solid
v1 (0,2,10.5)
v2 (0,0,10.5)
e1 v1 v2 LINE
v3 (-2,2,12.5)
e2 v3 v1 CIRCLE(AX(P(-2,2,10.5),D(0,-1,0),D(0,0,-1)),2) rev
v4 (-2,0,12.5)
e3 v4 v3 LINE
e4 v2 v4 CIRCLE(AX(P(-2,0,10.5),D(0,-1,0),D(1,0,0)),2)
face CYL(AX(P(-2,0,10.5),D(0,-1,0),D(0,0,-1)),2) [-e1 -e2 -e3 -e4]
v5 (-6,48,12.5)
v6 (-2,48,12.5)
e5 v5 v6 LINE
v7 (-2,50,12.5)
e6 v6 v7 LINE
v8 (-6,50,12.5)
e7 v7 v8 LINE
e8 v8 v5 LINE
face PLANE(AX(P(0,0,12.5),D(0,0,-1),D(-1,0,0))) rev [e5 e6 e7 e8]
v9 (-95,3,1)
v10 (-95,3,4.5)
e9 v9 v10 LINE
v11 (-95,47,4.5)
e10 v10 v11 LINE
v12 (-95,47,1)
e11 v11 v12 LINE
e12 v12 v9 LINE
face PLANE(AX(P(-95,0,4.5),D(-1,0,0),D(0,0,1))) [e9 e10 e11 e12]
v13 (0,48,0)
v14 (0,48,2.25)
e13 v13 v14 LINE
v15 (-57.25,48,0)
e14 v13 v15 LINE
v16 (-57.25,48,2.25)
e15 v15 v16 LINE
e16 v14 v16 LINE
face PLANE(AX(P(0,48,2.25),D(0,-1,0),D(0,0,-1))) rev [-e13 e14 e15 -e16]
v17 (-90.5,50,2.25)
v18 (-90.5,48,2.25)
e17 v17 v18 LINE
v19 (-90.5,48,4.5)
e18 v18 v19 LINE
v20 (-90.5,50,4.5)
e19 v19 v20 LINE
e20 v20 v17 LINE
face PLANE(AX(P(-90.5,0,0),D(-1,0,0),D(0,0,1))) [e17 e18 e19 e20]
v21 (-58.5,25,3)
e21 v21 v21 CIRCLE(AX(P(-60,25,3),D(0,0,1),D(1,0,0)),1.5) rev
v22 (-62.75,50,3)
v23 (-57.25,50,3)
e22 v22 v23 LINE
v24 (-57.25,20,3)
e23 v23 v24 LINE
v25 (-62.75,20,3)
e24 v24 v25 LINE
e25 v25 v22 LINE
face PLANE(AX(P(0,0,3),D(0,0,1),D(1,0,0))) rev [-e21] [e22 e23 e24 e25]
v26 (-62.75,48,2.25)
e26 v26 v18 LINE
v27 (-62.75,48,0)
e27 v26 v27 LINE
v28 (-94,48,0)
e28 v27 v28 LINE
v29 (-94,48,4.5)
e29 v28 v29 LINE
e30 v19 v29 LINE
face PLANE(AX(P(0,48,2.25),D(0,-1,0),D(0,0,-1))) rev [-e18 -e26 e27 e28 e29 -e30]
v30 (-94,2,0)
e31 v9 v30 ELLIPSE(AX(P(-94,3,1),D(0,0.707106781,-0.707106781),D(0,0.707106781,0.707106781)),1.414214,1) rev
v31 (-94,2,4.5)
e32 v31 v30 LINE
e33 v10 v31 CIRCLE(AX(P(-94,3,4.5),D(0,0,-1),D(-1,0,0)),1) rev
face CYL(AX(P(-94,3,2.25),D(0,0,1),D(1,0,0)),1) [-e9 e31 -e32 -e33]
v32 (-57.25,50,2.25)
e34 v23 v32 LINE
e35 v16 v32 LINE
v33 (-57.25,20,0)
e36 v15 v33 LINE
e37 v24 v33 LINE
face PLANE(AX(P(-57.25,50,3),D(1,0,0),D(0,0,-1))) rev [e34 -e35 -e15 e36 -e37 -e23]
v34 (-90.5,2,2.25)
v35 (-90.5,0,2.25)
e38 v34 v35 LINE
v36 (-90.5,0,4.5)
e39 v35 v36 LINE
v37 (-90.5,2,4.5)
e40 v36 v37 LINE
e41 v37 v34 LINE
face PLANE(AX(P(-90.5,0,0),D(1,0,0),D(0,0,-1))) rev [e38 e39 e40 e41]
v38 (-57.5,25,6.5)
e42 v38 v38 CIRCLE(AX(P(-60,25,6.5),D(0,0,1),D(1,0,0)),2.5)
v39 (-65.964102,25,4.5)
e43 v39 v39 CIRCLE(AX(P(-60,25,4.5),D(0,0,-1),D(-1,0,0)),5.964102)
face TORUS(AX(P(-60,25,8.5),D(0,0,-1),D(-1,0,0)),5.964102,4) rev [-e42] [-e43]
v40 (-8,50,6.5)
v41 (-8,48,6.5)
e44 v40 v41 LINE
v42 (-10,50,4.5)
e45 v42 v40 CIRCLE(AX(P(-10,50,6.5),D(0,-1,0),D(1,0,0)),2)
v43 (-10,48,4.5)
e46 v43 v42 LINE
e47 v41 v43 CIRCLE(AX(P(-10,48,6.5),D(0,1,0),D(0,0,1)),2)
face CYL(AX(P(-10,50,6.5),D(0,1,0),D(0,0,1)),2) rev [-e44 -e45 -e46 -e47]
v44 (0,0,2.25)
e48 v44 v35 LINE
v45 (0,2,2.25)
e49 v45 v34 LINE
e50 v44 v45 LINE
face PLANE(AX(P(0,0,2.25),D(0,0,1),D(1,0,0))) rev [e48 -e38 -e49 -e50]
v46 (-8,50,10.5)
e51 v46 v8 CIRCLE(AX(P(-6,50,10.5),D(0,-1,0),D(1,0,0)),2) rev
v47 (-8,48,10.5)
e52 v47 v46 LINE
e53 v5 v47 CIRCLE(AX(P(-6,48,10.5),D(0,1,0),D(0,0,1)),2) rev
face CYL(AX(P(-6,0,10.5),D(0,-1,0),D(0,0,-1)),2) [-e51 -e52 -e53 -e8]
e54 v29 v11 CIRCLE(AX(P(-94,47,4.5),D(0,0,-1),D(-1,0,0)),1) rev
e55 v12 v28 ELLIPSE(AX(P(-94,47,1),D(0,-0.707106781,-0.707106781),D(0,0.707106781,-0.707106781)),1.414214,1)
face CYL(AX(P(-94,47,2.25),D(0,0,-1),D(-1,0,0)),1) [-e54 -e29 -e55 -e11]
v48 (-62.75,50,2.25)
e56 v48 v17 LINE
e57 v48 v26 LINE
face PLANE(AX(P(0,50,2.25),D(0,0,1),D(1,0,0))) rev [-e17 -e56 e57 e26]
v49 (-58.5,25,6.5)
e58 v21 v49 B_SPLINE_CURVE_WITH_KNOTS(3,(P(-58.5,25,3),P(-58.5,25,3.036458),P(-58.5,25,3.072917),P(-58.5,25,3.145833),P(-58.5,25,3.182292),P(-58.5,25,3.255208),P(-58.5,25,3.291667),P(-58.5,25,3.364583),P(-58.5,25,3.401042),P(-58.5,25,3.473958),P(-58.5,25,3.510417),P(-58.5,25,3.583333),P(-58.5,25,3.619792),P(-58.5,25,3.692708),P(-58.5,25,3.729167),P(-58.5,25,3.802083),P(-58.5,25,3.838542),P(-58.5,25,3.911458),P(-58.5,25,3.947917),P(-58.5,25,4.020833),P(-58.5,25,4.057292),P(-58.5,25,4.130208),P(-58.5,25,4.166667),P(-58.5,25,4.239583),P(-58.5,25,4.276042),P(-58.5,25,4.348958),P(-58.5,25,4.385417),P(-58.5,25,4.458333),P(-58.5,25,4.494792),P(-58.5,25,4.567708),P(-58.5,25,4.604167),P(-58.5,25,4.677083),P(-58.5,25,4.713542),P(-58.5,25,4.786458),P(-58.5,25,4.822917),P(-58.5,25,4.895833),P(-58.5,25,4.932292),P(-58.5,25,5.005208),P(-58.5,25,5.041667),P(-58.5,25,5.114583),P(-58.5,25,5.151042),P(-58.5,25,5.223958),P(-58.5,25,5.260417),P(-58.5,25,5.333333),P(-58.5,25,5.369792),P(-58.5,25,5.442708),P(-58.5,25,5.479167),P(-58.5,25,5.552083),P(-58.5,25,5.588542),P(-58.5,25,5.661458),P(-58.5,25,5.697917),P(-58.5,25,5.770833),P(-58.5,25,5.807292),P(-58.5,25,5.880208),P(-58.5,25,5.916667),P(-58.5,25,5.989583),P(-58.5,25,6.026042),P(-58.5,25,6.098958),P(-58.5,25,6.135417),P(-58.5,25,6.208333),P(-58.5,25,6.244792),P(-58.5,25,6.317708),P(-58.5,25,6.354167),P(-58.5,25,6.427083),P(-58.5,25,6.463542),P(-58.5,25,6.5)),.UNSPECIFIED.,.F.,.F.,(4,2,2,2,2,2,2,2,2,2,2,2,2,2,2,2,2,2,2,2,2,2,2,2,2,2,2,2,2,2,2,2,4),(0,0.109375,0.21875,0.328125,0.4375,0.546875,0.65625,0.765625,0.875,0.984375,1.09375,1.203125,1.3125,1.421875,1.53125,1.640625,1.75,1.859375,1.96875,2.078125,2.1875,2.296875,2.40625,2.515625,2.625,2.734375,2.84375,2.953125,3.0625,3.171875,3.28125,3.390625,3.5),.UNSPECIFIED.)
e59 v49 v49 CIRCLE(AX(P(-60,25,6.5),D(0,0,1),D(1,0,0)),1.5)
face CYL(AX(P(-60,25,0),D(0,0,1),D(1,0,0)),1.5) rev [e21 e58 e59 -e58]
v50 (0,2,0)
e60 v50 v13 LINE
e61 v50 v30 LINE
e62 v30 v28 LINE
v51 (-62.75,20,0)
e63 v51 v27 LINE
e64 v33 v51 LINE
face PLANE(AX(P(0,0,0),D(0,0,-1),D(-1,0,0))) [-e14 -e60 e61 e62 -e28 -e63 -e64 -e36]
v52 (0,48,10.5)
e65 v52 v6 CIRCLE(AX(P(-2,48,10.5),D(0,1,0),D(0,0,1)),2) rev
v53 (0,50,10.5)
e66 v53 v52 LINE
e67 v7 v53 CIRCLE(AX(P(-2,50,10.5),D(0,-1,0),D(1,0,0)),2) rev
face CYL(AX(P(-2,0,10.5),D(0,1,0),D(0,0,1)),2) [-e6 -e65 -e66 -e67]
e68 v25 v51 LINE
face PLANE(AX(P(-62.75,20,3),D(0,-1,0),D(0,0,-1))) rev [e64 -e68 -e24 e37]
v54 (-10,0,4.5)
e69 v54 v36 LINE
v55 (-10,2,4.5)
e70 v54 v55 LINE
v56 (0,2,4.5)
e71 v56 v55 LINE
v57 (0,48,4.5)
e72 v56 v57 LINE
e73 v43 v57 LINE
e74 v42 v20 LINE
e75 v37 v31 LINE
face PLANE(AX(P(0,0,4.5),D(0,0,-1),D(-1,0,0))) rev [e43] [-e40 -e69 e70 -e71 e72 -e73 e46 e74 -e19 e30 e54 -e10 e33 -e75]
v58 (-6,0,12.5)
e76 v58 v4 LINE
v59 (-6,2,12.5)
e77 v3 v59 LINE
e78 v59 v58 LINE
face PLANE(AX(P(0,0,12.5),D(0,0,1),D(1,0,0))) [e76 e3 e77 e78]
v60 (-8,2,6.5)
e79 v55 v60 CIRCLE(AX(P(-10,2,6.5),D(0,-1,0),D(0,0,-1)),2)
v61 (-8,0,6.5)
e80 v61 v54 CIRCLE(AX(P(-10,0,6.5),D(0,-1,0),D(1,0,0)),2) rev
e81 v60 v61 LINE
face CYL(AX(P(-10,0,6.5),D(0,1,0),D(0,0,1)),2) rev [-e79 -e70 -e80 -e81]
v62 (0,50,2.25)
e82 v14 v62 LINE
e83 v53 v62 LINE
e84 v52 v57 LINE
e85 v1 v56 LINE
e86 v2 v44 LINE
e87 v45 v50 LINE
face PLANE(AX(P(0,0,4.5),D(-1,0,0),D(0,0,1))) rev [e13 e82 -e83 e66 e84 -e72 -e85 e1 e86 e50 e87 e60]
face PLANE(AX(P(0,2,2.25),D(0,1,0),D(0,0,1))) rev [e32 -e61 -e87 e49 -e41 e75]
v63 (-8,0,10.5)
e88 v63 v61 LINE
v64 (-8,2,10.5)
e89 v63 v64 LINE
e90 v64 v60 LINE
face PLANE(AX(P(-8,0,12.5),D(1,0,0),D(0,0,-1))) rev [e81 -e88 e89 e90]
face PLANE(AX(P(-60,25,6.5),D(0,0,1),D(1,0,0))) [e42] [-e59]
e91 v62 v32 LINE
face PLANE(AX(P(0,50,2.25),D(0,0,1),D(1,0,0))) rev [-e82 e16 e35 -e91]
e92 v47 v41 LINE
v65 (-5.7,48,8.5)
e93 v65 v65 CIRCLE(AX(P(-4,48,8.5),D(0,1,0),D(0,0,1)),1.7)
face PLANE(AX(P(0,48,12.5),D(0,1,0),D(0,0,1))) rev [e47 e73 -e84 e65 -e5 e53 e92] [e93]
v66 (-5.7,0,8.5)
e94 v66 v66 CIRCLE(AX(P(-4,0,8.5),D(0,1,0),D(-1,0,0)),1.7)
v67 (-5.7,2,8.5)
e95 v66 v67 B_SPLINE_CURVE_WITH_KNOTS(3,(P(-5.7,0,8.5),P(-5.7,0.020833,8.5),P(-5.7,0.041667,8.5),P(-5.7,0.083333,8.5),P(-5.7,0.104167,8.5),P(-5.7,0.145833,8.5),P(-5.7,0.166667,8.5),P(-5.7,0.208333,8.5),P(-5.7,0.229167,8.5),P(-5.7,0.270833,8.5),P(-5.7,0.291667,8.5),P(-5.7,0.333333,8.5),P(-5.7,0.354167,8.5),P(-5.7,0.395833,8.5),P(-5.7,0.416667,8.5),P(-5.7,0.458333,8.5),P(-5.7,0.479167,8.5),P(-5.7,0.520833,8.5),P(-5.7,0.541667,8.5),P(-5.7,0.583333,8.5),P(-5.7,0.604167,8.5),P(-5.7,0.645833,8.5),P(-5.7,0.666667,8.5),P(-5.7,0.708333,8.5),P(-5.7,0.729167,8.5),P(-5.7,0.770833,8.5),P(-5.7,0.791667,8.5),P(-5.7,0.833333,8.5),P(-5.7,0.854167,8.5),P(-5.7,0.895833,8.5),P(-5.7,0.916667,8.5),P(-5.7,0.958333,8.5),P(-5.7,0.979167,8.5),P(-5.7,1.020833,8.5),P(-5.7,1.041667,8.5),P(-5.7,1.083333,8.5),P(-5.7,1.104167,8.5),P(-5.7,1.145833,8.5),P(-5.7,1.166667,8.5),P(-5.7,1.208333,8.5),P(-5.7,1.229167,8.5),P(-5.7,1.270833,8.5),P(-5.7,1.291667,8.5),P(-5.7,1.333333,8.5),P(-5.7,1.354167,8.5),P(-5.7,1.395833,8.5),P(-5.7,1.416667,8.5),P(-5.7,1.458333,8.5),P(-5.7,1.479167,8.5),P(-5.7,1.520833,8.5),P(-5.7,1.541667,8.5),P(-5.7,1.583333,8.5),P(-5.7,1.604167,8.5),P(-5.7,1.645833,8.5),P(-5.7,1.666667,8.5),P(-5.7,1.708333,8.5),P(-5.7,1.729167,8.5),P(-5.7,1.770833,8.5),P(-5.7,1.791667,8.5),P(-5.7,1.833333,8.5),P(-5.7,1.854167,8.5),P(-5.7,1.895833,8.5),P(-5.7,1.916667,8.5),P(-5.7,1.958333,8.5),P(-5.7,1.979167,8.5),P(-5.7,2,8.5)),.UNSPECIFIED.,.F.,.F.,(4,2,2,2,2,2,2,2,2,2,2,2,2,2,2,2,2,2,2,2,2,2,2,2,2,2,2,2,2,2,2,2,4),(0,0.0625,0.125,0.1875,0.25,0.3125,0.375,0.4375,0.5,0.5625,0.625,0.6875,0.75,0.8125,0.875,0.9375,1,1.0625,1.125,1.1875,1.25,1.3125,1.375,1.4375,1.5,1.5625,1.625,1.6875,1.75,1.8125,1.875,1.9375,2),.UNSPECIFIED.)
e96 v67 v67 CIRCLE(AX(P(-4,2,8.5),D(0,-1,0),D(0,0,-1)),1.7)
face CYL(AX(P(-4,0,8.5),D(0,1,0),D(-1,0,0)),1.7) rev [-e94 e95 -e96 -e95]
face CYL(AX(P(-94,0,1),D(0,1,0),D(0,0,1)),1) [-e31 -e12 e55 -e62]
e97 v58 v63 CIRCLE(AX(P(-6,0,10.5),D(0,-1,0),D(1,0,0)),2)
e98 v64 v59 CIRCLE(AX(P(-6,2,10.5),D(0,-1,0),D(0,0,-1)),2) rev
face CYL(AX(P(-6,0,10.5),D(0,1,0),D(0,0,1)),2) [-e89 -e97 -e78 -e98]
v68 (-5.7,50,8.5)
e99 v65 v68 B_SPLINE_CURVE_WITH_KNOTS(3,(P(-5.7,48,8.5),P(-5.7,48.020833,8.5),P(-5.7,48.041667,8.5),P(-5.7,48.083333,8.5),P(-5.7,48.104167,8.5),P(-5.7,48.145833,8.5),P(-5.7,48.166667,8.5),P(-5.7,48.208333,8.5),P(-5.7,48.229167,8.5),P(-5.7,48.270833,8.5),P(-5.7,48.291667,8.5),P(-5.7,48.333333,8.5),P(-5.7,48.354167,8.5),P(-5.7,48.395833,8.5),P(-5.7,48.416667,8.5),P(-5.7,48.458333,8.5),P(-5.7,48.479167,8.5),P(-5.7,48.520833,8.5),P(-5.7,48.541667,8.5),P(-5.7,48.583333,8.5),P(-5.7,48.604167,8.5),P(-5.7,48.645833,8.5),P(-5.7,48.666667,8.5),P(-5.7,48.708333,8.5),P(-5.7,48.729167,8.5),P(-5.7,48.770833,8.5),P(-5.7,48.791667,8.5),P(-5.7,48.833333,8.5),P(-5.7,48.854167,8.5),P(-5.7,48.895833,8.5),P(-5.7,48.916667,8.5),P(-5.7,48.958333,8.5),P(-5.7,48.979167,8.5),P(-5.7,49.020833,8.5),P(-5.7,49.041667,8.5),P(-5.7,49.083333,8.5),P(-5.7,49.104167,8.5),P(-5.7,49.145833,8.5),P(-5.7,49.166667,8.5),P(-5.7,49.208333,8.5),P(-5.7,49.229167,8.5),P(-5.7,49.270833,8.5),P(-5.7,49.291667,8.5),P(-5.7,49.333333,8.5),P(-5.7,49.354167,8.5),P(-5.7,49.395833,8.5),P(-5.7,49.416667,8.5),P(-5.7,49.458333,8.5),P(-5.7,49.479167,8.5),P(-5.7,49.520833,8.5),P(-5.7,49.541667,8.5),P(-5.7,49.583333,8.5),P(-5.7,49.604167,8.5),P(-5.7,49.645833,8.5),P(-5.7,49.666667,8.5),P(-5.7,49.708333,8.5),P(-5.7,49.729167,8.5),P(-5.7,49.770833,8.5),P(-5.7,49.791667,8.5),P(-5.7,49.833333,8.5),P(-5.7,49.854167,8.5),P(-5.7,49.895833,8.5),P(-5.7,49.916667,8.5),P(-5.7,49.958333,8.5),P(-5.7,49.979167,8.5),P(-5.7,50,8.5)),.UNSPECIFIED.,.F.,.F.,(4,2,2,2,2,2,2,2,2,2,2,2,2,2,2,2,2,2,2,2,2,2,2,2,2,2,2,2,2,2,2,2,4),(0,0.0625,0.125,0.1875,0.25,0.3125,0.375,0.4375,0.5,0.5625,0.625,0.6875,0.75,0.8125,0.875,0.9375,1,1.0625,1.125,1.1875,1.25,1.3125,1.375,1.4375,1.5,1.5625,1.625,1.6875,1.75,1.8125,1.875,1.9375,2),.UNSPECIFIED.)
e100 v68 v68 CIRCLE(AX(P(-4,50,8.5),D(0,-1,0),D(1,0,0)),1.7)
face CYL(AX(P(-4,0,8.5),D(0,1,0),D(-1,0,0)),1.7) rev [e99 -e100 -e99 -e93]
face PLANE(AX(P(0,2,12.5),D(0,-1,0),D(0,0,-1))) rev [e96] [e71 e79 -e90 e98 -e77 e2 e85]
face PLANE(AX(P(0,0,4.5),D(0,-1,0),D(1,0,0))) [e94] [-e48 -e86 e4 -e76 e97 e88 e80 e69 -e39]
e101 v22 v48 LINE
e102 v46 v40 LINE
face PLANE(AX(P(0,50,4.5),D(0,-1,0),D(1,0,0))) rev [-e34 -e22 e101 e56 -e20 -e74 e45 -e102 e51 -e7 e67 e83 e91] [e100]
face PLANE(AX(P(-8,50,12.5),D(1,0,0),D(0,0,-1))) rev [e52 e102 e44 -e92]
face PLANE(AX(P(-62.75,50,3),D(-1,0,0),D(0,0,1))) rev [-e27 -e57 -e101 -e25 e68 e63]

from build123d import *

# Parameters (mm, degrees)
SKETCH1_W               = 50
SKETCH1_H               = 95
BOSS_EXTRUDE1_DEPTH     = 4.5
SKETCH2_R               = 0.5
CUT_EXTRUDE1_DEPTH      = 108.448825028
SKETCH3_W               = 2
SKETCH3_H               = 2.25
CUT_EXTRUDE2_DEPTH      = 108.448825028
SKETCH5_R               = 2.5
BOSS_EXTRUDE2_DEPTH     = 2
SKETCH6_R               = 1.5
CUT_EXTRUDE3_DEPTH      = 108.551150621
FILLET1_R               = 4
SKETCH8_W               = 5.5
SKETCH8_H               = 30
CUT_EXTRUDE4_DEPTH      = 3
SKETCH10_W              = 2
SKETCH10_H              = 2.25
CUT_EXTRUDE5_DEPTH      = 4.5
FILLET2_R               = 1
SKETCH11_W              = 8
SKETCH11_H              = 2
BOSS_EXTRUDE3_DEPTH     = 8
CUT_EXTRUDE6_DEPTH      = 109.079831606
CUT_EXTRUDE6_DEPTH_BACK = 109.079831606
SKETCH12_R              = 1.7
FILLET3_R               = 2


with BuildPart() as part:
    # Sketch1 → Boss-Extrude1 (new body)
    with BuildSketch(Plane(origin=(0, 0, 0), x_dir=(0, 1, 0), z_dir=(0, 0, 1))):
        with Locations((25, 47.5)):
            Rectangle(SKETCH1_W, SKETCH1_H)
    extrude(amount=BOSS_EXTRUDE1_DEPTH)

    # Sketch2 → Cut-Extrude1 (cut, through all)
    with BuildSketch(Plane.XY.offset(4.5)):
        with Locations((-60, 25)):
            Circle(SKETCH2_R)
    extrude(amount=-CUT_EXTRUDE1_DEPTH, mode=Mode.SUBTRACT)

    # Sketch3 → Cut-Extrude2 (cut, through all)
    with BuildSketch(Plane(origin=(-95, 0, 0), x_dir=(0, -1, 0), z_dir=(-1, 0, 0))):
        with Locations((-49, 1.125)):
            Rectangle(SKETCH3_W, SKETCH3_H)
        with Locations((-1, 1.125)):
            Rectangle(SKETCH3_W, SKETCH3_H)
    extrude(amount=-CUT_EXTRUDE2_DEPTH, mode=Mode.SUBTRACT)

    # Sketch5 → Boss-Extrude2 (add)
    with BuildSketch(Plane.XY.offset(4.5)):
        with Locations(Location((-60, 25, 0), (0, 0, 180))):
            Circle(SKETCH5_R)
    extrude(amount=BOSS_EXTRUDE2_DEPTH)

    # Sketch6 → Cut-Extrude3 (cut, through all)
    with BuildSketch(Plane.XY.offset(6.5)):
        with Locations((-60, 25)):
            Circle(SKETCH6_R)
    extrude(amount=-CUT_EXTRUDE3_DEPTH, mode=Mode.SUBTRACT)

    # Fillet1
    # the kernel refuses this fillet: 4 mm, written as the material it adds along each edge
    with BuildSketch(Plane(origin=(-60, 25, 4.5), x_dir=(-1, 0, 0), z_dir=(0, 1, 0))) as fillet1_piece_1:
        with BuildLine():
            CenterArc((5.964101615, 4), FILLET1_R, 210, 60)
            Line((2.5, 2), (2.430717968, 1.96))
            ThreePointArc((2.430717968, 1.96), (2.42, 1), (2.42, 0))
            Line((2.42, 0), (2.5, -0.08))
            Line((2.5, -0.08), (5.964101615, -0.08))
            Line((5.964101615, -0.08), (5.964101615, 0))
        make_face()
    revolve(axis=Axis((-60, 25, 4.5), (0, 0, 1)))

    # Sketch8 → Cut-Extrude4 (cut)
    with BuildSketch(Plane(origin=(0, 0, 0), x_dir=(1, 0, 0), z_dir=(0, 0, -1))):
        with Locations((-60, -35)):
            Rectangle(SKETCH8_W, SKETCH8_H)
    extrude(amount=-CUT_EXTRUDE4_DEPTH, mode=Mode.SUBTRACT)

    # Sketch10 → Cut-Extrude5 (cut)
    with BuildSketch(Plane(origin=(-95, 0, 0), x_dir=(0, -1, 0), z_dir=(-1, 0, 0))):
        with Locations((-49, 3.375)):
            Rectangle(SKETCH10_W, SKETCH10_H)
        with Locations((-1, 3.375)):
            Rectangle(SKETCH10_W, SKETCH10_H)
    extrude(amount=-CUT_EXTRUDE5_DEPTH, mode=Mode.SUBTRACT)

    # Fillet2
    fillet2_edges = [part.edges().sort_by_distance(p)[0] for p in [
        (-95, 25, 0),
        (-95, 48, 2.25),
        (-95, 2, 2.25),
    ]]
    fillet(fillet2_edges, radius=FILLET2_R)

    # Sketch11 → Boss-Extrude3 (add)
    with BuildSketch(Plane.XY.offset(4.5)):
        with Locations((-4, 49)):
            Rectangle(SKETCH11_W, SKETCH11_H)
        with Locations((-4, 1)):
            Rectangle(SKETCH11_W, SKETCH11_H)
    extrude(amount=BOSS_EXTRUDE3_DEPTH)

    # Sketch12 → Cut-Extrude6 (cut, two sides: drawn at the far end of the back side and taken through both)
    with BuildSketch(Plane(origin=(0, 50, 0), x_dir=(-1, 0, 0), z_dir=(0, 1, 0)).offset(-CUT_EXTRUDE6_DEPTH_BACK)):
        with Locations((4, 8.5)):
            Circle(SKETCH12_R)
    extrude(amount=CUT_EXTRUDE6_DEPTH + CUT_EXTRUDE6_DEPTH_BACK, mode=Mode.SUBTRACT)

    # Fillet3
    fillet3_edges = [part.edges().sort_by_distance(p)[0] for p in [
        (-8, 49, 4.5),
        (0, 49, 12.5),
        (-8, 49, 12.5),
        (-8, 1, 4.5),
        (0, 1, 12.5),
        (-8, 1, 12.5),
    ]]
    fillet(fillet3_edges, radius=FILLET3_R)


solid = part.part
